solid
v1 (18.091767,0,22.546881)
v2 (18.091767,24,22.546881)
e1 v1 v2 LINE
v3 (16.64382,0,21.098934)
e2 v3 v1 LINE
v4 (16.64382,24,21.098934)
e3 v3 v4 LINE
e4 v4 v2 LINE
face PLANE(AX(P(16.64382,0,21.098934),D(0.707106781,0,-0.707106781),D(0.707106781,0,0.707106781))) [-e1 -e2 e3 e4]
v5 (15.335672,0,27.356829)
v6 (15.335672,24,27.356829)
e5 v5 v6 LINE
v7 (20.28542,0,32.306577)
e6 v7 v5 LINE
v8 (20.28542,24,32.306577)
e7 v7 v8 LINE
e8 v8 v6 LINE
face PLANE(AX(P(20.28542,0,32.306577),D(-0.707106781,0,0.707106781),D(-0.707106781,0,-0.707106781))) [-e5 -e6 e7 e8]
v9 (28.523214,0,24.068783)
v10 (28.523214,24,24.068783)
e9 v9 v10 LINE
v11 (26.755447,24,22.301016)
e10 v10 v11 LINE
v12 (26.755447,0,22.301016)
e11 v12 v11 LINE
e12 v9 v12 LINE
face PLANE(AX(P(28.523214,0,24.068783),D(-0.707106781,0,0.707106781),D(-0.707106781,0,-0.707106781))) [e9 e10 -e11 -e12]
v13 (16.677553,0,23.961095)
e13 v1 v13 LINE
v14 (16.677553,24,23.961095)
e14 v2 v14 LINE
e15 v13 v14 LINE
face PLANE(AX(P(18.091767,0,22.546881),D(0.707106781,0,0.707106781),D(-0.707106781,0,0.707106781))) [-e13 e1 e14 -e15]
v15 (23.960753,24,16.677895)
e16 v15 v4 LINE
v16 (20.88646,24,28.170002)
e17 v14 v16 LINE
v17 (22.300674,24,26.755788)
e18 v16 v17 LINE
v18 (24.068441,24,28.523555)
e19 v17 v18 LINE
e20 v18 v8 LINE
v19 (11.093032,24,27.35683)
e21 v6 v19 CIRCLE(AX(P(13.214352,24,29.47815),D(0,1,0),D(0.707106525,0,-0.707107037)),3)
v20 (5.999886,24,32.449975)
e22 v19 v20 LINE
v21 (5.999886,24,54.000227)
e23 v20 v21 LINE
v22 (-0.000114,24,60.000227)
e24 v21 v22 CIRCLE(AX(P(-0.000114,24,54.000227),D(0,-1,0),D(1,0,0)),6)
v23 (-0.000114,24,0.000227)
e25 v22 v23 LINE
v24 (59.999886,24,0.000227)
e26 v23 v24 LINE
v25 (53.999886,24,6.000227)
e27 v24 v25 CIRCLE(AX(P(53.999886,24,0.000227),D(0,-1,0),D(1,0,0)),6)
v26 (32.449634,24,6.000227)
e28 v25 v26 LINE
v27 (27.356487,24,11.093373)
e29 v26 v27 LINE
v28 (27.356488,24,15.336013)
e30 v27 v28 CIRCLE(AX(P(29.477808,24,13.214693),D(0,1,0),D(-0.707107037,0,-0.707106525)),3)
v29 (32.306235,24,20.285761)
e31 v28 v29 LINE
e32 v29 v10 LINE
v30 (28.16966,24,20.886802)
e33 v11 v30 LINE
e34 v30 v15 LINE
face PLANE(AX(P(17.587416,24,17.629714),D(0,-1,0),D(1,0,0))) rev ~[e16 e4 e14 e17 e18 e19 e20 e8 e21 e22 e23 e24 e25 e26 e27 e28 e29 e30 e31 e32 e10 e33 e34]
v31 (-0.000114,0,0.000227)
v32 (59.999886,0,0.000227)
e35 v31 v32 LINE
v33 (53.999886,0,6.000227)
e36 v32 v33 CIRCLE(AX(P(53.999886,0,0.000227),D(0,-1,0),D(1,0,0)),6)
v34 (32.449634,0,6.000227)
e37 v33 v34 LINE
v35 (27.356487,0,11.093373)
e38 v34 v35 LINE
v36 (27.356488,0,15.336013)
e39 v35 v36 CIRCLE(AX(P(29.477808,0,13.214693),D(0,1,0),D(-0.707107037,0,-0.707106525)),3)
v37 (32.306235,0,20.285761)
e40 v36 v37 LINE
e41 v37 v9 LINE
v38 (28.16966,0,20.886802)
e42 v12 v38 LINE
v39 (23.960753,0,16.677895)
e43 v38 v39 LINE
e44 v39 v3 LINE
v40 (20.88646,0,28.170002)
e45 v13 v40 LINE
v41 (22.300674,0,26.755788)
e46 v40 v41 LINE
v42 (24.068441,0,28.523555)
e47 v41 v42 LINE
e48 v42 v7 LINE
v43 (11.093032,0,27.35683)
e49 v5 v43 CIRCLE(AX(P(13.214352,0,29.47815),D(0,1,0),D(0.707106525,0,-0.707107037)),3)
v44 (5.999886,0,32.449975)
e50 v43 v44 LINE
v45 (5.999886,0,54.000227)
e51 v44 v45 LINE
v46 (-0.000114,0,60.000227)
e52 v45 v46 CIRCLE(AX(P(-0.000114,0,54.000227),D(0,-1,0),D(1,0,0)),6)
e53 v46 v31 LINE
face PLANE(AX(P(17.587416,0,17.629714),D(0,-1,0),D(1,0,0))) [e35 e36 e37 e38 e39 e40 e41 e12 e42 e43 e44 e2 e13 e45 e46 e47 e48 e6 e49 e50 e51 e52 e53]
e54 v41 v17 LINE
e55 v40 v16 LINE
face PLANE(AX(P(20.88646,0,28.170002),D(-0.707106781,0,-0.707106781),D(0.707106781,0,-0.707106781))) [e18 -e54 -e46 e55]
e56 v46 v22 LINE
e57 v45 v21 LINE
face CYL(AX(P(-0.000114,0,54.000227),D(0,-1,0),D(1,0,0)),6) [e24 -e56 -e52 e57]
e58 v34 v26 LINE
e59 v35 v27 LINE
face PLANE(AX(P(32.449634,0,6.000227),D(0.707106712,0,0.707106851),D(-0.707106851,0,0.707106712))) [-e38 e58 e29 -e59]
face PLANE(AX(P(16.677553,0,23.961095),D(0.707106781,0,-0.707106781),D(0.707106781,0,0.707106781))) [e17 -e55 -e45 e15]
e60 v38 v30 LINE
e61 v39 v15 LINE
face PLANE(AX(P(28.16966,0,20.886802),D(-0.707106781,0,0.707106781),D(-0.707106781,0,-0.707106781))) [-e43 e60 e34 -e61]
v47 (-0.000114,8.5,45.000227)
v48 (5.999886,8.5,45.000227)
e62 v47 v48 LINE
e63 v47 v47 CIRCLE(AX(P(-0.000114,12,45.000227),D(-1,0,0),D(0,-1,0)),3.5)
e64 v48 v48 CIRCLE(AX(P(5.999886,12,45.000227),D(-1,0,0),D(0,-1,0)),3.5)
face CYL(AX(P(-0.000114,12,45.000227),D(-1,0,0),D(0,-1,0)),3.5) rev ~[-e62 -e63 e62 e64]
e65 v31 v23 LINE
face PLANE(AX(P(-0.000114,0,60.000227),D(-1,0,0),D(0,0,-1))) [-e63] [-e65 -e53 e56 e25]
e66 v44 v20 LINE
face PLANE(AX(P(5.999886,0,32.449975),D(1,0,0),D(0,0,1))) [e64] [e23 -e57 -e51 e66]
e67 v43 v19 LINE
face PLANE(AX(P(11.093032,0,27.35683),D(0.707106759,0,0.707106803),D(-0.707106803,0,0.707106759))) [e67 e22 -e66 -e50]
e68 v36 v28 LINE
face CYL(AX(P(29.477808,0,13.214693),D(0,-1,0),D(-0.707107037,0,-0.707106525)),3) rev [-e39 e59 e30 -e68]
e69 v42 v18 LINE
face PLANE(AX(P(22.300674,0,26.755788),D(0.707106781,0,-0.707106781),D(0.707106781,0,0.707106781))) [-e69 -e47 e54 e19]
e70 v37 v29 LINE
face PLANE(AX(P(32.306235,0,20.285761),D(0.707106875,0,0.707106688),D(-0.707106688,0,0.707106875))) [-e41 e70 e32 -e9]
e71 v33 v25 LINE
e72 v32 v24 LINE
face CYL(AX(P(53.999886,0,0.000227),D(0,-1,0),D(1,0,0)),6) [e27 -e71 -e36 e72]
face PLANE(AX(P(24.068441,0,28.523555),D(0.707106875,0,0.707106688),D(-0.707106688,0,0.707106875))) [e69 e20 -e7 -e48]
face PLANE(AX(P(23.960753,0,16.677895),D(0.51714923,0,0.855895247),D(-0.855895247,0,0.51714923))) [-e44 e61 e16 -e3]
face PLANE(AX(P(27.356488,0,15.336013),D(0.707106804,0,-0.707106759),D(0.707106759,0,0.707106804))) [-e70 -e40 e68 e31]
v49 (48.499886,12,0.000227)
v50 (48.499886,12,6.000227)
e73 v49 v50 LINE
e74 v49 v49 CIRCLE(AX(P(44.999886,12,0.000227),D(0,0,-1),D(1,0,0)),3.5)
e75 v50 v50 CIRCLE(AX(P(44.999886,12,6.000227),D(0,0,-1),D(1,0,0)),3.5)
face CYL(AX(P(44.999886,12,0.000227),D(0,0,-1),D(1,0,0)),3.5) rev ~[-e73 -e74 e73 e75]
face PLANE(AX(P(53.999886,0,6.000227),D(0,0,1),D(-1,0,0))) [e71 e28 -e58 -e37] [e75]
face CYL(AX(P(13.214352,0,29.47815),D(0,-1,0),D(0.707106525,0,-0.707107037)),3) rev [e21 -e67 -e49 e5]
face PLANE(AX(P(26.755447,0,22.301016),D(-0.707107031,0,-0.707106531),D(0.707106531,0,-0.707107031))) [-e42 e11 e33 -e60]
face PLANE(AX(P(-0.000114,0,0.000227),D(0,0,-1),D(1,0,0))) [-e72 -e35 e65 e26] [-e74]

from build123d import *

# Parameters (mm, degrees)
F1_DEPTH = 24
F2_R     = 3.5
F3_DEPTH = 6
F4_R     = 3.5
F5_DEPTH = 6


# Not quite as in the source:
# - ends of sketch curves that miss each other by under 0.0002 mm in the source are joined


with BuildPart() as f1:
    # F0 (on Front) → F1 (new body)
    with BuildSketch(Plane.XZ):
        with BuildLine():
            Line((5.999886, 45.000227), (-0.000114, 45.000227))
            Line((-0.000114, 45.000227), (-0.000114, 0.000227))
            Line((-0.000114, 0.000227), (44.999886, 0.000227))
            Line((44.999886, 0.000227), (44.999886, 6.000227))
            Line((44.999886, 6.000227), (32.449634, 6.000227))
            Line((32.449634, 6.000227), (27.356487, 11.093373))
            ThreePointArc((27.356487, 11.093373), (26.477808, 13.214693), (27.3564876564, 15.3360133436))
            Line((27.3564876564, 15.3360133436), (32.306235, 20.285761))
            Line((32.306235, 20.285761), (28.523214, 24.068783))
            Line((28.523214, 24.068783), (26.755447, 22.301016))
            Line((26.755447, 22.301016), (28.16966, 20.886802))
            Line((28.16966, 20.886802), (23.960753, 16.677895))
            Line((23.960753, 16.677895), (16.64382, 21.098934))
            Line((16.64382, 21.098934), (18.091767, 22.546881))
            Line((18.091767, 22.546881), (16.677553, 23.961095))
            Line((16.677553, 23.961095), (20.88646, 28.170002))
            Line((20.88646, 28.170002), (22.300674, 26.755788))
            Line((22.300674, 26.755788), (24.068441, 28.523555))
            Line((24.068441, 28.523555), (20.28542, 32.306577))
            Line((20.28542, 32.306577), (15.335672, 27.356829))
            ThreePointArc((15.335672, 27.356829), (13.2143523536, 26.47815), (11.0930316564, 27.3568296564))
            Line((11.0930316564, 27.3568296564), (5.999886, 32.449975))
            Line((5.999886, 32.449975), (5.999886, 45.000227))
        make_face()
        with BuildLine():
            ThreePointArc((4.499886, 4.000227), (4.1463326094, 4.1466736094), (3.999886, 4.500227))
            Line((3.999886, 4.500227), (3.999886, 29.000227))
            ThreePointArc((3.999886, 29.000227), (4.3085446105, 29.4621669016), (4.8534398906, 29.3537798906))
            Line((4.8534398906, 29.3537798906), (13.567905, 20.639315))
            Line((13.567905, 20.639315), (11.243789, 18.315199))
            ThreePointArc((11.243789, 18.315199), (10.3880809238, 17.170688427), (9.8910739732, 15.8308650058))
            Line((9.8910739732, 15.8308650058), (11.753138, 13.968801))
            Line((11.753138, 13.968801), (12.364509, 14.132617))
            ThreePointArc((12.364509, 14.132617), (16.54708952, 16.547432386), (14.1322760675, 12.364850252))
            Line((14.1322760675, 12.364850252), (13.968459, 11.75348))
            Line((13.968459, 11.75348), (15.830523, 9.891416))
            ThreePointArc((15.830523, 9.891416), (17.1703461165, 10.3884227548), (18.3148569059, 11.2441310941))
            Line((18.3148569059, 11.2441310941), (20.638973, 13.568247))
            Line((20.638973, 13.568247), (29.353439, 4.853781))
            ThreePointArc((29.353439, 4.853781), (29.461825631, 4.3088849572), (28.999886, 4.000227))
            Line((28.999886, 4.000227), (4.499886, 4.000227))
        make_face(mode=Mode.SUBTRACT)
        with BuildLine():
            Line((3.999886, 29.000227), (3.999886, 4.500227))
            ThreePointArc((3.999886, 4.500227), (4.1463326094, 4.1466736094), (4.499886, 4.000227))
            Line((4.499886, 4.000227), (28.999886, 4.000227))
            ThreePointArc((28.999886, 4.000227), (29.461825631, 4.3088849572), (29.3534398906, 4.8537798906))
            Line((29.3534398906, 4.8537798906), (20.638973, 13.568247))
            Line((20.638973, 13.568247), (18.314857, 11.244131))
            ThreePointArc((18.314857, 11.244131), (17.1703461165, 10.3884227548), (15.8305230058, 9.8914159732))
            Line((15.8305230058, 9.8914159732), (13.968459, 11.75348))
            Line((13.968459, 11.75348), (14.132276, 12.36485))
            ThreePointArc((14.132276, 12.36485), (16.54708952, 16.547432386), (12.364508569, 14.1326168845))
            Line((12.364508569, 14.1326168845), (11.753138, 13.968801))
            Line((11.753138, 13.968801), (9.891074, 15.830865))
            ThreePointArc((9.891074, 15.830865), (10.3880809238, 17.170688427), (11.2437895941, 18.3151994059))
            Line((11.2437895941, 18.3151994059), (13.567905, 20.639315))
            Line((13.567905, 20.639315), (4.853439, 29.353781))
            ThreePointArc((4.853439, 29.353781), (4.3085446105, 29.4621669016), (3.999886, 29.000227))
        make_face()
        with BuildLine():
            ThreePointArc((5.999886, 54.000227), (4.2425266871, 58.2428676871), (-0.000114, 60.000227))
            Line((-0.000114, 60.000227), (-0.000114, 45.000227))
            Line((-0.000114, 45.000227), (5.999886, 45.000227))
            Line((5.999886, 45.000227), (5.999886, 54.000227))
        make_face()
        with BuildLine():
            Line((44.999886, 6.000227), (44.999886, 0.000227))
            Line((44.999886, 0.000227), (59.999886, 0.000227))
            ThreePointArc((59.999886, 0.000227), (58.2425266871, 4.2428676871), (53.999886, 6.000227))
            Line((53.999886, 6.000227), (44.999886, 6.000227))
        make_face()
    extrude(amount=-F1_DEPTH)

    # F2 (on face) → F3 (cut)
    with BuildSketch(Plane(origin=(-0.000114, 0, 0), x_dir=(0, -1, 0), z_dir=(-1, 0, 0))):
        with Locations((-12, 45.000227)):
            Circle(F2_R)
    extrude(amount=-F3_DEPTH, mode=Mode.SUBTRACT)

    # F4 (on face) → F5 (cut)
    with BuildSketch(Plane(origin=(0, 0, 0.000227), x_dir=(1, 0, 0), z_dir=(0, 0, -1))):
        with Locations((44.999886, -12)):
            Circle(F4_R)
    extrude(amount=-F5_DEPTH, mode=Mode.SUBTRACT)


solid = f1.part
